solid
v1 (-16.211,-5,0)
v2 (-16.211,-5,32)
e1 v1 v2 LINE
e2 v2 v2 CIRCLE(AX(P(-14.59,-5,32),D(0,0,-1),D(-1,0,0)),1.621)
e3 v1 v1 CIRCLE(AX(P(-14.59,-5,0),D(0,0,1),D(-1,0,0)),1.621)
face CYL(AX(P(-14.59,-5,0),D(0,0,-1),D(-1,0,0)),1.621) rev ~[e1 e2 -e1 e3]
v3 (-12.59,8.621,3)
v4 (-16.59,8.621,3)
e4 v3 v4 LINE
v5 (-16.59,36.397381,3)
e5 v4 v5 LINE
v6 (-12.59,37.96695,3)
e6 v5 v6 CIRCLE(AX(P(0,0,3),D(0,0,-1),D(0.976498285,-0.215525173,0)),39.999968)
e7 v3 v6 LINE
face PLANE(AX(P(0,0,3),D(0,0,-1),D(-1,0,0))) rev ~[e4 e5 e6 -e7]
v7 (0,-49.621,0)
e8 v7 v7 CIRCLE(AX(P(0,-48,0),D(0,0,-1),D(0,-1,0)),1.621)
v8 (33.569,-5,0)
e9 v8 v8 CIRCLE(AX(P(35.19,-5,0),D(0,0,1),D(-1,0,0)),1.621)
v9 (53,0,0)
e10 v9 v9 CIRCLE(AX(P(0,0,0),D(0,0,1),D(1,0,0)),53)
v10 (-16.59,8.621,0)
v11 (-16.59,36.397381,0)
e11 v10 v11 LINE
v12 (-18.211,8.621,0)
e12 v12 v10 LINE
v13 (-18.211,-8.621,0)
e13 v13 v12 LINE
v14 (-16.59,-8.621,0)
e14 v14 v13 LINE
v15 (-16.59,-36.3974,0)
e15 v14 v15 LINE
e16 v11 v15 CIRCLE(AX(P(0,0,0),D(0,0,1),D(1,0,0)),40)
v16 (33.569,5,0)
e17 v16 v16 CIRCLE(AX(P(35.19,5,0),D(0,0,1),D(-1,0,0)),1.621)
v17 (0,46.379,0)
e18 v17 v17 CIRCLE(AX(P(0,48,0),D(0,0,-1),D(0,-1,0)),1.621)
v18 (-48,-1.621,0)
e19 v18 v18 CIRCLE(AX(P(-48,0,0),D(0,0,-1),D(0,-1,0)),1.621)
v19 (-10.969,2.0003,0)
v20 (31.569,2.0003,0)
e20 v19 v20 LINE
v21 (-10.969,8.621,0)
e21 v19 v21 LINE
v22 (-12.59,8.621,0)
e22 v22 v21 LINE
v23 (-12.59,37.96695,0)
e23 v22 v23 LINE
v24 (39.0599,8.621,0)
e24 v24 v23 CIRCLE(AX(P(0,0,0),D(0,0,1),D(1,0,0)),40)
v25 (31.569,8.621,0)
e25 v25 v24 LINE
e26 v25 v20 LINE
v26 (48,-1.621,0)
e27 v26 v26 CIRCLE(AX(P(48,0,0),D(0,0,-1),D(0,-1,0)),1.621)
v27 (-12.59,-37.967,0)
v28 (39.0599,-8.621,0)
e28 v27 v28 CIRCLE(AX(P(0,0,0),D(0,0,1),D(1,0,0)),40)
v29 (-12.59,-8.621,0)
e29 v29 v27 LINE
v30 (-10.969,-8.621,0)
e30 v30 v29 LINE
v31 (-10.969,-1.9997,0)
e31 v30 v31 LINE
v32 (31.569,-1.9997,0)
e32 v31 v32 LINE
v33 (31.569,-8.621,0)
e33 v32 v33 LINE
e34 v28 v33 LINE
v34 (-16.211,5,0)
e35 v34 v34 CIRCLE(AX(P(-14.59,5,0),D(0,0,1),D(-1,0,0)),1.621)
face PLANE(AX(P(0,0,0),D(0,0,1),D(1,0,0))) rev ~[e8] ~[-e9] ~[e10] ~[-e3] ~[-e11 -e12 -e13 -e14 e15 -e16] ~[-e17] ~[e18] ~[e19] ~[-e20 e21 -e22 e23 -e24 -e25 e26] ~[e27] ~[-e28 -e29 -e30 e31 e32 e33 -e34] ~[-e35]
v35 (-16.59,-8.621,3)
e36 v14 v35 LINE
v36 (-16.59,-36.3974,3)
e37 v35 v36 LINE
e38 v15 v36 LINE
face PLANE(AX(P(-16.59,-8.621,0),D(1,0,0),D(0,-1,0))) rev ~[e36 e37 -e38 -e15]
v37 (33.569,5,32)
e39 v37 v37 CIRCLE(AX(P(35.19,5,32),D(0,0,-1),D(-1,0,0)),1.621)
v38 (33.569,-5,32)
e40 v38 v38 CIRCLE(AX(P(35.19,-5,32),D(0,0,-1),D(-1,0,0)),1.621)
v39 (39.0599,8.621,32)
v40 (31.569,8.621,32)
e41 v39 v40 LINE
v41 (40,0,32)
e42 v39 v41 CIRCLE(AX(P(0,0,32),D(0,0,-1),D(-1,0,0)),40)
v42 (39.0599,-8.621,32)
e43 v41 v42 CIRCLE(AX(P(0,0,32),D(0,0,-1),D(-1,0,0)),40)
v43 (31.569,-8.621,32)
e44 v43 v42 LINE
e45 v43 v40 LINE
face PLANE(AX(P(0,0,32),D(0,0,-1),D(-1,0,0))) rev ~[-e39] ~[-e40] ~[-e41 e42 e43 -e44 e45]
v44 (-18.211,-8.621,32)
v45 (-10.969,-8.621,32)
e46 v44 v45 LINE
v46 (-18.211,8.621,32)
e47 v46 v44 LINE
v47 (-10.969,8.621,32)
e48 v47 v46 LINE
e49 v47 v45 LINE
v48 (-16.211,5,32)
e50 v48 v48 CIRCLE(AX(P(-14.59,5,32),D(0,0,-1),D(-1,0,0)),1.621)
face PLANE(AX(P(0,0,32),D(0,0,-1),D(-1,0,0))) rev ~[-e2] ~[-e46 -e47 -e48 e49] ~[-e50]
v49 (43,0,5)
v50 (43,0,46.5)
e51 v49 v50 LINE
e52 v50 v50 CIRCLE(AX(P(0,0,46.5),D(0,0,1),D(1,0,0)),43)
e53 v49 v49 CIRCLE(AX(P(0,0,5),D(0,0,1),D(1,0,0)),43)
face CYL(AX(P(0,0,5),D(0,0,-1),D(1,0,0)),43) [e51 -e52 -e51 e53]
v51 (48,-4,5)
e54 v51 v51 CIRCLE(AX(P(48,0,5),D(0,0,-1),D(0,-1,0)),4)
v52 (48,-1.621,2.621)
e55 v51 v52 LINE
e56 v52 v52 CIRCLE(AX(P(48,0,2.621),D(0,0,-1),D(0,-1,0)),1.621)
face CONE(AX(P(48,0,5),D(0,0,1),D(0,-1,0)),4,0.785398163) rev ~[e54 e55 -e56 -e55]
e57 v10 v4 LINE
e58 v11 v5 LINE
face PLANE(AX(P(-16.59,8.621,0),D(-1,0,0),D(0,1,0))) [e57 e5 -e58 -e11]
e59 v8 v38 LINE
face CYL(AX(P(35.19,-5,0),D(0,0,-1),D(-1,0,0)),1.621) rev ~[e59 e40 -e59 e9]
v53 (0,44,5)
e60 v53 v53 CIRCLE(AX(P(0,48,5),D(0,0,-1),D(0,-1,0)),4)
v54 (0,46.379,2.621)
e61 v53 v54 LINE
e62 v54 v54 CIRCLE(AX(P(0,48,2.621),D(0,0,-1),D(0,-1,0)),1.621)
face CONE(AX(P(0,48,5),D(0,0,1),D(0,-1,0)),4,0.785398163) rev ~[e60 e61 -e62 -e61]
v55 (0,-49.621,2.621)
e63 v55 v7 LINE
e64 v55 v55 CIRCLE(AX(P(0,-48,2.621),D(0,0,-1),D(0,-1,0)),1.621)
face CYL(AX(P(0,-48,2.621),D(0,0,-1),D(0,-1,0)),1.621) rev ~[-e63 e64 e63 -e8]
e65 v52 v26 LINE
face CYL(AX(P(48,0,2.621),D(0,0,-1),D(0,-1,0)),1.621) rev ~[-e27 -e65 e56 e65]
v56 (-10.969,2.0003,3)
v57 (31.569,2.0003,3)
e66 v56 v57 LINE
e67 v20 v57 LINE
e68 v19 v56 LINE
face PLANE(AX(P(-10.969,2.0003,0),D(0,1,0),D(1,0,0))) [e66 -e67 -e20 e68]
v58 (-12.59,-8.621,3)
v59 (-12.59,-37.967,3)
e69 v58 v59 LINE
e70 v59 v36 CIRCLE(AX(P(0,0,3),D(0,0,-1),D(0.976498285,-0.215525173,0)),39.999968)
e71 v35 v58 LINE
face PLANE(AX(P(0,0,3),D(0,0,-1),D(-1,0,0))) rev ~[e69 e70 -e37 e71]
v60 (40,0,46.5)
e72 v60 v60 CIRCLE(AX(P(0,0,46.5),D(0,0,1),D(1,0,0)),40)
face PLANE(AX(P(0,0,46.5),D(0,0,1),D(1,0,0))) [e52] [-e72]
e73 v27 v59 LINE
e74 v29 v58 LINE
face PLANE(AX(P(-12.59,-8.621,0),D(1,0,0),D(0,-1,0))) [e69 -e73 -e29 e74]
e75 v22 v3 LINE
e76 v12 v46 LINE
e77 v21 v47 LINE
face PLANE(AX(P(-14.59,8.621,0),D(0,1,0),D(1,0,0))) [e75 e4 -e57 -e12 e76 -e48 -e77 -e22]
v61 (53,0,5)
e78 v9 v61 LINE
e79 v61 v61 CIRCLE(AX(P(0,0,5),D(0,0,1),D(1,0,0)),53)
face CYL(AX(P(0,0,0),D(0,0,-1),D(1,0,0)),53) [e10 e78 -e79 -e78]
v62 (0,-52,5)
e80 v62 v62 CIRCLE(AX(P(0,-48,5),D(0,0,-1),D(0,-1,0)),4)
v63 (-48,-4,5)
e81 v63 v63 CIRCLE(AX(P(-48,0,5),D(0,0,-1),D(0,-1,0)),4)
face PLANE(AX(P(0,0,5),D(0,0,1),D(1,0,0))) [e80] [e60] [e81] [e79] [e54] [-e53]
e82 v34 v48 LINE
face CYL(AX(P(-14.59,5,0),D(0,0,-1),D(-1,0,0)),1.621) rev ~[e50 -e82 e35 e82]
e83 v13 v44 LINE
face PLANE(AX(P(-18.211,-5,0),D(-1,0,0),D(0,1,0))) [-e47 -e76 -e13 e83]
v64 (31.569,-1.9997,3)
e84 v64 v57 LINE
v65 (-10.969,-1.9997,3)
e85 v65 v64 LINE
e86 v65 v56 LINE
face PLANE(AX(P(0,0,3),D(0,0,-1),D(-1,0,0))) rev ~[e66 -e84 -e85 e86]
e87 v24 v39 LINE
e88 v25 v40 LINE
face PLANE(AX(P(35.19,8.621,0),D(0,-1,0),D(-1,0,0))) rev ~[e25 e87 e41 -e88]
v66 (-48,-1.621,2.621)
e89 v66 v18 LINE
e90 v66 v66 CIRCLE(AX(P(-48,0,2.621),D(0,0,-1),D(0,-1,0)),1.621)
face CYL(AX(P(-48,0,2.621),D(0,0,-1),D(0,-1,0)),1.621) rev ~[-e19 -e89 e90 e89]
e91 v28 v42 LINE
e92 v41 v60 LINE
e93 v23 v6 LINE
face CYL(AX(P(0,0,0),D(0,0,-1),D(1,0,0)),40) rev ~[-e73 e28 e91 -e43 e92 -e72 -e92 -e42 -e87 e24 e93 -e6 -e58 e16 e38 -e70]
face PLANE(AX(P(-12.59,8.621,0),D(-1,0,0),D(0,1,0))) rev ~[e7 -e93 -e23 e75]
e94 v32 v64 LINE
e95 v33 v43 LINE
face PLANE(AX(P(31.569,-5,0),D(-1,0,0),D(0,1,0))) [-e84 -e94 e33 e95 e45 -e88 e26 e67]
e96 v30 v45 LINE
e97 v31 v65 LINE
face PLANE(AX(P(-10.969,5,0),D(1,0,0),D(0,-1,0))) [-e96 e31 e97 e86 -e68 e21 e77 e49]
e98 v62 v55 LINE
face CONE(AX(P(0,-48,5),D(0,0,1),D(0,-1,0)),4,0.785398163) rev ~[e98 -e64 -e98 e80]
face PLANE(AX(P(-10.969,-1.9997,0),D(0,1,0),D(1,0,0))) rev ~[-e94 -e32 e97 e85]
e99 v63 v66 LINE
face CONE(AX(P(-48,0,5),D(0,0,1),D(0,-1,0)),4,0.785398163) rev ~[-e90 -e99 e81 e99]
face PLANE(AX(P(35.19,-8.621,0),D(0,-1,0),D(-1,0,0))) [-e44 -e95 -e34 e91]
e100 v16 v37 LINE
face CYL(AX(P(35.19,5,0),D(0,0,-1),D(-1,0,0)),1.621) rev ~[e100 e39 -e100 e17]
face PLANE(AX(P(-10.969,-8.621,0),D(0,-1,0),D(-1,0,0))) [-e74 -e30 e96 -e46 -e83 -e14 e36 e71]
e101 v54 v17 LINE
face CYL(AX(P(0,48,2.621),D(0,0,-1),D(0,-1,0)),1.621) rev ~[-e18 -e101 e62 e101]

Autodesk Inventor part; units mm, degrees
ref_plane "YZ Plane" through (0, 0, 0) normal (1, 0, 0) x (0, 1, 0)
ref_plane "XZ Plane" through (0, 0, 0) normal (0, 1, 0) x (-1, 0, 0)
ref_plane "XY Plane" through (0, 0, 0) normal (0, 0, 1) x (1, 0, 0)
sketch "Szkic1" plane through (0, 0, 0) normal (0, 0, 1) x (1, 0, 0)
  circle A0 centre (0, 0) radius 40
  circle A1 centre (0, 0) radius 53
  dimension "d0" = 80
  dimension "d1" = 13
extrude "Wyciągnięcie proste1" add sketch "Szkic1" along normal blind 5
sketch "Szkic2" plane through (0, 0, 5) normal (0, 0, 1) x (1, 0, 0)
  circle A0 centre (0, 0) radius 40 projected
  circle A1 centre (0, 0) radius 43
  dimension "d4" = 3
extrude "Wyciągnięcie proste2" add sketch "Szkic2" along normal blind 41.5
sketch "Szkic3" plane through (0, 0, 5) normal (0, 0, 1) x (1, 0, 0)
  circle A0 centre (0, 0) radius 43 projected
  line L0 (0, 43) -> (0, 53)
  circle A1 centre (0, 0) radius 53 projected
  line L1 (43, 0) -> (53, 0)
  line L2 (0, -43) -> (0, -53)
  line L3 (-43, 0) -> (-53, 0)
  point P0 (0, 48)
  point P1 (-48, 0)
  point P2 (0, -48)
  point P3 (48, 0)
hole "Otwór1" at (0, 48, 5) at (-48, 0, 5) at (0, -48, 5) at (48, 0, 5) direction (0, 0, -1) diameter 3.242 end through all countersink diameter 8 countersink angle 90 thread size "M4x0.7" designation "M4" class "6H" standard "GB Metric profile"
sketch "Szkic8" plane through (0, 0, 0) normal (0, 0, -1) x (-1, 0, 0)
  circle A0 centre (0, 0) radius 10.75
  line L0 (0, 0) -> (17, 0)
  line L1 (17, 0) -> (14.59, 0)
  line L2 (14.59, 0) -> (14.59, 5)
  line L3 (14.59, 0) -> (14.59, -5)
  circle A1 centre (14.59, 5) radius 1.621
  circle A2 centre (14.59, -5) radius 1.621
  line L4 (14.59, 5) -> (-35.19, 5)
  line L5 (14.59, -5) -> (-35.19, -5)
  circle A3 centre (-35.19, 5) radius 1.621
  circle A4 centre (-35.19, -5) radius 1.621
  line L6 (-33.569, -5) -> (-31.569, -5)
  line L7 (-31.569, -5) -> (-31.569, 5)
  line L8 (-35.19, 6.621) -> (-35.19, 8.621)
  line L9 (-35.19, 8.621) -> (-31.569, 8.621)
  line L10 (-31.569, 8.621) -> (-31.569, 5)
  line L11 (-36.811, 5) -> (-38.811, 5)
  line L12 (-35.19, -6.621) -> (-35.19, -8.621)
  line L13 (-35.19, -8.621) -> (-31.569, -8.621)
  line L14 (-31.569, -8.621) -> (-31.569, -5)
  line L15 (-35.19, -8.621) -> (-38.811, -8.621)
  line L16 (-38.811, 5) -> (-38.811, 8.621)
  line L17 (-38.811, 8.621) -> (-35.19, 8.621)
  line L18 (12.969, -5) -> (10.969, -5)
  line L19 (14.59, -6.621) -> (14.59, -8.621)
  line L20 (10.969, -5) -> (10.969, -8.621)
  line L21 (10.969, -8.621) -> (14.59, -8.621)
  line L22 (14.59, 6.621) -> (14.59, 8.621)
  line L23 (14.59, 8.621) -> (10.969, 8.621)
  line L24 (10.969, 8.621) -> (10.969, -5)
  line L25 (16.211, -5) -> (18.211, -5)
  line L26 (14.59, -8.621) -> (18.211, -8.621)
  line L27 (18.211, -8.621) -> (18.211, 8.621)
  line L28 (18.211, 8.621) -> (14.59, 8.621)
  circle A5 centre (0, 0) radius 40 projected
  line L29 (-38.811, -8.621) -> (-39.0599, -8.621)
  line L30 (-38.811, 8.621) -> (-39.0599, 8.621)
  line L31 (-31.569, 8.621) -> (-30.569, 8.621)
  line L32 (-30.569, 8.621) -> (-30.569, -8.621)
  line L33 (-30.569, -8.621) -> (-31.569, -8.621)
  dimension "d59" = 3.242
  dimension "d54" = 21.5
  dimension "d55" = 17
  dimension "d56" = 2.41
  dimension "d57" = 5
  dimension "d58" = 5
  dimension "d60" = 3.242
  dimension "d61" = 49.78
  dimension "d62" = 3.242
  dimension "d63" = 3.242
  dimension "d64" = 2
  dimension "d66" = 2
  dimension "d67" = 2
  dimension "d68" = 2
  dimension "d69" = 2
  dimension "d70" = 2
  dimension "d71" = 2
  dimension "d74" = 49.78
  dimension "d87" = 1
extrude "Wyciągnięcie proste6" add sketch "Szkic8" against normal blind 32 contours L24 L4 A1 L2 L0 | L0 L3 A2 L5 L24 | L24 L23 L22 A1 L4 | L5 A2 L19 L21 L20 | L2 A1 L22 L28 L27 L25 A2 L3 | L7 L5 A4 L12 L15 L29 A5 L30 L16 L11 A3 L4 | L4 A3 L8 L9 L10 | L14 L13 L12 A4 L5 | A2 L25 L27 L26 L19 | A3 L11 L16 L17 L8
sketch "Szkic9" plane through (0, 0, 0) normal (0, 0, -1) x (-1, 0, 0)
  line L0 (11.0032, 0) -> (10.969, -1.9997)
  line L1 (10.969, -8.621) -> (10.969, 8.621) projected
  line L2 (10.969, -1.9997) -> (10.969, 2.0003)
  line L3 (10.969, 2.0003) -> (-31.569, 2.0003)
  line L4 (-31.569, -8.621) -> (-31.569, 8.621) projected
  line L5 (10.969, -1.9997) -> (-31.569, -1.9997)
  circle A0 centre (14.59, -5) radius 1.621 projected
  line L6 (14.59, -5) -> (14.59, -8.621)
  line L7 (18.211, -8.621) -> (10.969, -8.621) projected
  line L8 (14.59, -8.621) -> (12.59, -8.621)
  line L9 (12.59, -8.621) -> (16.59, -8.621)
  line L10 (16.59, -8.621) -> (16.59, -36.3974)
  arc A1 (-39.0599, -8.621) -> (-39.0599, 8.621) centre (0, 0) ccw projected
  line L11 (12.59, -8.621) -> (12.59, -37.967)
  line L12 (10.969, 8.621) -> (18.211, 8.621) projected
  line L13 (12.59, 8.621) -> (12.59, 45.8086)
  line L14 (12.59, 8.621) -> (49.7776, 8.621) construction
  line L15 (16.59, 8.621) -> (16.59, 43)
  point P0 (16.59, 36.3974)
  point P1 (12.59, 37.967)
  dimension "d75" = 2
  dimension "d76" = 4
  dimension "d77" = 2
  dimension "d78" = 4
  dimension "d79" = 90
extrude "Wyciągnięcie proste7" add sketch "Szkic9" against normal blind 3 contours L5 L4 L3 L1 | L7 L10 A1 L11 | L13 A1 L15 L12
equation "\"d62\" = d59"
equation "\"d63\" = d60"
equation "\"d74\" = d61"
properties part number "Podstawa1"
